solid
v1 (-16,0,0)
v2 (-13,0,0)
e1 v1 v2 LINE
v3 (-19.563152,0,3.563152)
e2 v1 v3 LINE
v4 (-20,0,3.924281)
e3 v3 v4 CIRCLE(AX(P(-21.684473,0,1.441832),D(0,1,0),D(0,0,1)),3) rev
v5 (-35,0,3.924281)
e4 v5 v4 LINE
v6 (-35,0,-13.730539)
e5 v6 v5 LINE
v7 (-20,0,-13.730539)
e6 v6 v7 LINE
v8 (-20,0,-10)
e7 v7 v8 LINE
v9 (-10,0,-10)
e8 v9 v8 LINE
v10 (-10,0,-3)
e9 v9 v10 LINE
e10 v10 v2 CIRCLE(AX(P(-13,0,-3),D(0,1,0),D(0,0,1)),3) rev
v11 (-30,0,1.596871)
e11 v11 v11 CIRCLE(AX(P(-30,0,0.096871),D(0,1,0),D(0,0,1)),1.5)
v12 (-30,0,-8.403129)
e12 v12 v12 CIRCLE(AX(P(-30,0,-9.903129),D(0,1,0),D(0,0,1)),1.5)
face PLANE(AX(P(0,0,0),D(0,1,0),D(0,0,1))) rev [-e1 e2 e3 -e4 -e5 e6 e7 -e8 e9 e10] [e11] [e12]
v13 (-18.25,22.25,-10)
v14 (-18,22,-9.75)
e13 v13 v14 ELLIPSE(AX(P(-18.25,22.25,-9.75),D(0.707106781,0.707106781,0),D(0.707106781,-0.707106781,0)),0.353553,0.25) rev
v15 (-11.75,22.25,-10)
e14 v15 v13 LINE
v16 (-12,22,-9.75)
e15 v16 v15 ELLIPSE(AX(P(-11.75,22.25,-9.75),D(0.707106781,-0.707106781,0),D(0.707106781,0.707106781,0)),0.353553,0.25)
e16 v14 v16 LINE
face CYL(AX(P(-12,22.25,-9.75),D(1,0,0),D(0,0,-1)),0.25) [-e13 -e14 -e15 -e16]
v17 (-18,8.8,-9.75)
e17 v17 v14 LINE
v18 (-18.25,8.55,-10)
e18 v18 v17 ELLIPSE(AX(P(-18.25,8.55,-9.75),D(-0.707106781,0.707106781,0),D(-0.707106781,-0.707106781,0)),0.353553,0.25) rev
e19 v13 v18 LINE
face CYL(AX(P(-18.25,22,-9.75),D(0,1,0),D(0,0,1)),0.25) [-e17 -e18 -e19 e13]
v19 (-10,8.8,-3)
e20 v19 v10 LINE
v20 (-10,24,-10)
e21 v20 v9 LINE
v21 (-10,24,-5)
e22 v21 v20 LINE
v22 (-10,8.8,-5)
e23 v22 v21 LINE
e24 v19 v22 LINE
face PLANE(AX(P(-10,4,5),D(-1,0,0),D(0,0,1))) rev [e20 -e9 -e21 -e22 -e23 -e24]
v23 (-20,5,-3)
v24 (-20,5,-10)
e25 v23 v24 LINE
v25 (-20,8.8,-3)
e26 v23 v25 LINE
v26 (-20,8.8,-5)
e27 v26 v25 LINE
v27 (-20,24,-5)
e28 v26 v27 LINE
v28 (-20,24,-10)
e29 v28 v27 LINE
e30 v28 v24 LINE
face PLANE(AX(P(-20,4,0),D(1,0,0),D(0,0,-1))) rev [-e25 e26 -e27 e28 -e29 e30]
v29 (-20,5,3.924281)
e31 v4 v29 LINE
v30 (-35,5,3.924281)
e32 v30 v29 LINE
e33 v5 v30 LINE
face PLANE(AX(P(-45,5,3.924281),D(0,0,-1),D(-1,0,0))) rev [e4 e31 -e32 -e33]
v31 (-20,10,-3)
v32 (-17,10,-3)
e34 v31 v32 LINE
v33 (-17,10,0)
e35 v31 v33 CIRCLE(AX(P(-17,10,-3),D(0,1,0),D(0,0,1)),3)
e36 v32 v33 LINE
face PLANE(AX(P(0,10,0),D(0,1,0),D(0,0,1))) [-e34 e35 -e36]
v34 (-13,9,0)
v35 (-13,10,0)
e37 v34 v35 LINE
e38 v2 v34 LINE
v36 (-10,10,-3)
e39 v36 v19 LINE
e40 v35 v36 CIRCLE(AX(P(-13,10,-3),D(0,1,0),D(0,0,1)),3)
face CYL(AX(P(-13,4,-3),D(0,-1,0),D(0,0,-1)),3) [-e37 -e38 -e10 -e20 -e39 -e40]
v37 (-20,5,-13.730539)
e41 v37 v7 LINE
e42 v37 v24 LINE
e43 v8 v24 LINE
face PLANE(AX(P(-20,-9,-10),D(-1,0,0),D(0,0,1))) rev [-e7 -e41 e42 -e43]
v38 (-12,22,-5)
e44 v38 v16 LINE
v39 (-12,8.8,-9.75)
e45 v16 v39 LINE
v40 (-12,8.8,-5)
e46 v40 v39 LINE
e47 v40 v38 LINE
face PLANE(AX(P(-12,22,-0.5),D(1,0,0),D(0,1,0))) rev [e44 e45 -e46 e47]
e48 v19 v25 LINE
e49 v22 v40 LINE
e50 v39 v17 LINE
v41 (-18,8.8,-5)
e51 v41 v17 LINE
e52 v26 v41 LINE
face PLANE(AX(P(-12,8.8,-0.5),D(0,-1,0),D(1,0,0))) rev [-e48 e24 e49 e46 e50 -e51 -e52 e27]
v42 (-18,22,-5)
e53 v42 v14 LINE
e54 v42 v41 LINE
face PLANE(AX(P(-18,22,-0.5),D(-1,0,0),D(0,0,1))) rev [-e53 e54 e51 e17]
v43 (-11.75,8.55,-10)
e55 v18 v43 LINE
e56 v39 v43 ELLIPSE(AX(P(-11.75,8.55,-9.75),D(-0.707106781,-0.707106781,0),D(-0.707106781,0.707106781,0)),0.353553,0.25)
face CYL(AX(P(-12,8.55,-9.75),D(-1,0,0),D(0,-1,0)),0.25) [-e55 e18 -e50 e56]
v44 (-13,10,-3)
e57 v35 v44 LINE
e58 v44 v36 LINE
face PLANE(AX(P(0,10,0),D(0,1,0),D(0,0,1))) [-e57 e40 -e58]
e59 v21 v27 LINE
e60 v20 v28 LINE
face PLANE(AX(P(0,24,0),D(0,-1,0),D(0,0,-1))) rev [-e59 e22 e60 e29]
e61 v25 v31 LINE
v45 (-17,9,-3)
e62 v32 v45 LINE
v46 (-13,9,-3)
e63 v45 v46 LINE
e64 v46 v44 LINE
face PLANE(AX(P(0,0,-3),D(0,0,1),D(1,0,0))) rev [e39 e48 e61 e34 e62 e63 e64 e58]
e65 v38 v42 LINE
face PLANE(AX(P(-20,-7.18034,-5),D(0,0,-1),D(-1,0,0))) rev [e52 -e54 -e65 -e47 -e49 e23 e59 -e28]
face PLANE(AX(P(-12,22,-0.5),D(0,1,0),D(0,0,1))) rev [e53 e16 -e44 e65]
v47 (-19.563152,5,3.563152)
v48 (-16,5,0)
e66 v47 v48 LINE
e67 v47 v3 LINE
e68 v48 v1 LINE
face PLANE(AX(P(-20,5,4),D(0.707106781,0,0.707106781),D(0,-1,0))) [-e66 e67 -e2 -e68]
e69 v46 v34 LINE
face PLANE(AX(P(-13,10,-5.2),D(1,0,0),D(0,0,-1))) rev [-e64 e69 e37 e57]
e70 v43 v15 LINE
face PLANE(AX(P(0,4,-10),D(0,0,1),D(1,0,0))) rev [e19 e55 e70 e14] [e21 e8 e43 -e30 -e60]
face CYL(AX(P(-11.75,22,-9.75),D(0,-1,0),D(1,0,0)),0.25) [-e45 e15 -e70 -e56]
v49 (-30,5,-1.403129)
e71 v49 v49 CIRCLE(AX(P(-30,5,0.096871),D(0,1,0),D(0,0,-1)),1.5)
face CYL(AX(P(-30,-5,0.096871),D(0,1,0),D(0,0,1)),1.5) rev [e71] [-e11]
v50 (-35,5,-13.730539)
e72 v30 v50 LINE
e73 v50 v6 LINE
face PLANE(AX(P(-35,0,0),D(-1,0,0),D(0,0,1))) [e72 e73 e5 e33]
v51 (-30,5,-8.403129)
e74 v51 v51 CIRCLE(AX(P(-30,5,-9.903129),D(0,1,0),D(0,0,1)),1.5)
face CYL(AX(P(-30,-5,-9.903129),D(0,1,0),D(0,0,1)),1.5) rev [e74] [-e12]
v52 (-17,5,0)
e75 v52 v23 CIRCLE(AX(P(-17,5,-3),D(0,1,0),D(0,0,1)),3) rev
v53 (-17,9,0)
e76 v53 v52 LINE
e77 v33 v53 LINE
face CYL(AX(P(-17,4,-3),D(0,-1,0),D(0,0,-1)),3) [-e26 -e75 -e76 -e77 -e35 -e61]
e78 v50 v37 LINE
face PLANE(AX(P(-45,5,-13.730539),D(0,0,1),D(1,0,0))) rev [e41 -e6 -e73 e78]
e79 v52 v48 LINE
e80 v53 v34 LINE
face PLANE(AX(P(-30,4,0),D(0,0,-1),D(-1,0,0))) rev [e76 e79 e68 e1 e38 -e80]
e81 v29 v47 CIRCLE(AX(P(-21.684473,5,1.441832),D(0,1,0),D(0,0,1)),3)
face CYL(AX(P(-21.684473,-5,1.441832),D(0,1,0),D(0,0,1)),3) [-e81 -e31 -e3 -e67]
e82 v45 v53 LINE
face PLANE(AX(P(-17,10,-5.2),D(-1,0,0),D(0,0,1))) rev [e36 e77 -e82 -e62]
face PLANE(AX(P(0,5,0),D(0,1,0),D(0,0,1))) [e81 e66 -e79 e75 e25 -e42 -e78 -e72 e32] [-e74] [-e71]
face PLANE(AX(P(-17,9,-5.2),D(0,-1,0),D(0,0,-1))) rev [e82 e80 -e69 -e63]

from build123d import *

# Parameters (mm, degrees)
EXTRUDE_1_DEPTH      = 4
SKETCH_2_W           = 10
SKETCH_2_H           = 15
EXTRUDE_2_DEPTH      = 20
SKETCH_3_R           = 1.45
CUT_EXTRUDE_1_DEPTH  = 20
SKETCH_4_W           = 6
SKETCH_4_H           = 13.2
CUT_EXTRUDE_2_DEPTH  = 9.5
SKETCH_6_R           = 0.75
CUT_EXTRUDE_4_DEPTH  = 3.5
SKETCH_7_W           = 10
SKETCH_7_H           = 24
CUT_EXTRUDE_5_DEPTH  = 5
SKETCH_9_W           = 3
SKETCH_9_H           = 12
CUT_EXTRUDE_6_DEPTH  = 10
SKETCH_11_W          = 1.5
SKETCH_11_H          = 12
CUT_EXTRUDE_7_DEPTH  = 10
CUT_EXTRUDE_8_REACH  = 41.699
SKETCH_13_W          = 10
SKETCH_13_H          = 5
SKETCH_19_W          = 10
SKETCH_19_H          = 2.4
EXTRUDE_6_DEPTH      = 4.8
SKETCH_20_W          = 10
SKETCH_20_H          = 2.6
EXTRUDE_7_DEPTH      = 6
FILLET_17_R          = 0.25
SKETCH_21_W          = 4
SKETCH_21_H          = 1
CUT_EXTRUDE_9_DEPTH  = 5.2
EXTRUDE_8_DEPTH      = 0.4
EXTRUDE_START        = 1
SKETCH_29_W          = 10
SKETCH_29_H          = 10
SKETCH_29_R          = 1.45
EXTRUDE_9_DEPTH      = 1
SKETCH_36_W          = 10
SKETCH_36_H          = 10
CUT_EXTRUDE_10_DEPTH = 10
SKETCH_38_W          = 10
SKETCH_38_H          = 5
EXTRUDE_10_DEPTH     = 20
SKETCH_39_W          = 10
SKETCH_39_H          = 5
EXTRUDE_11_DEPTH     = 10
SKETCH_40_R          = 1.5
CUT_EXTRUDE_11_DEPTH = 15
CHAMFER_1_SIZE       = 4
SKETCH_46_W          = 40
SKETCH_46_H          = 5
EXTRUDE_12_DEPTH     = 32
SKETCH_47_R          = 1.5
CUT_EXTRUDE_12_DEPTH = 10
SKETCH_48_W          = 24
SKETCH_48_H          = 16
SKETCH_48_H_2        = 6.075719237
CUT_EXTRUDE_13_DEPTH = 10
EXTRUDE_13_DEPTH     = 5
CHAMFER_2_SIZE       = 6
FILLET_18_R          = 3
CUT_EXTRUDE_14_DEPTH = 10
SKETCH_55_W          = 17.654819926
SKETCH_55_H          = 5
EXTRUDE_14_DEPTH     = 25
SKETCH_60_W          = 17.654819926
SKETCH_60_H          = 5
CUT_EXTRUDE_15_DEPTH = 10
SKETCH_61_R          = 1.5
CUT_EXTRUDE_16_DEPTH = 10
SKETCH_66_W          = 4.869638013
SKETCH_66_H          = 4.33889787
CUT_EXTRUDE_17_DEPTH = 14


with BuildPart() as part:
    # 草图1 → 凸台-拉伸1 (new body)
    with BuildSketch(Plane(origin=(0, 0, 0), x_dir=(1, 0, 0), z_dir=(0, 1, 0))):
        Polygon((-20, 0), (-20, -5), (-10, -5), (-10, 0), (0, 0), (0, 10), (-30, 10), (-30, 0), align=None)
    extrude(amount=EXTRUDE_1_DEPTH)

    # 草图2 → 凸台-拉伸2 (add)
    with BuildSketch(Plane(origin=(0, 4, 0), x_dir=(1, 0, 0), z_dir=(0, 1, 0))):
        with Locations((-15, 2.5)):
            Rectangle(SKETCH_2_W, SKETCH_2_H)
    extrude(amount=EXTRUDE_2_DEPTH)

    # 草图3 → 切除-拉伸1 (cut)
    with BuildSketch(Plane(origin=(0, 4, 0), x_dir=(1, 0, 0), z_dir=(0, 1, 0))):
        with Locations(Location((-5, 5, 0), (0, 0, 270))):
            Circle(SKETCH_3_R)
    extrude(amount=-CUT_EXTRUDE_1_DEPTH, mode=Mode.SUBTRACT)

    # 草图4 → 切除-拉伸2 (cut)
    with BuildSketch(Plane(origin=(0, 0, -10), x_dir=(-1, 0, 0), z_dir=(0, 0, -1))):
        with Locations((15, 15.4)):
            Rectangle(SKETCH_4_W, SKETCH_4_H)
    extrude(amount=-CUT_EXTRUDE_2_DEPTH, mode=Mode.SUBTRACT)

    # 草图6 → 切除-拉伸4 (cut)
    with BuildSketch(Plane(origin=(0, 0, -0.5), x_dir=(-1, 0, 0), z_dir=(0, 0, -1))):
        with Locations((15, 20.68)):
            Circle(SKETCH_6_R)
        with Locations((15, 10.52)):
            Circle(SKETCH_6_R)
        with Locations((15, 15.6)):
            Circle(SKETCH_6_R)
    extrude(amount=-CUT_EXTRUDE_4_DEPTH, mode=Mode.SUBTRACT)

    # 草图7 → 切除-拉伸5 (cut)
    with BuildSketch(Plane.XY.offset(5)):
        with Locations((-15, 12)):
            Rectangle(SKETCH_7_W, SKETCH_7_H)
    extrude(amount=-CUT_EXTRUDE_5_DEPTH, mode=Mode.SUBTRACT)

    # 草图9 → 切除-拉伸6 (cut)
    with BuildSketch(Plane(origin=(0, 0, -0.5), x_dir=(-1, 0, 0), z_dir=(0, 0, -1))):
        with Locations((15, 15.6)):
            Rectangle(SKETCH_9_W, SKETCH_9_H)
    extrude(amount=-CUT_EXTRUDE_6_DEPTH, mode=Mode.SUBTRACT)

    # 草图11 → 切除-拉伸7 (cut)
    with BuildSketch(Plane(origin=(0, 0, -0.5), x_dir=(-1, 0, 0), z_dir=(0, 0, -1))):
        with Locations((17.25, 15.6)):
            Rectangle(SKETCH_11_W, SKETCH_11_H)
        with Locations((12.75, 15.6)):
            Rectangle(SKETCH_11_W, SKETCH_11_H)
    extrude(amount=-CUT_EXTRUDE_7_DEPTH, mode=Mode.SUBTRACT)

    # 切除-拉伸8: up to this face of the body (flat: up to its plane)
    cut_extrude_8_end = Plane(part.part.faces().sort_by_distance((-5, 4, -9.858578644))[0])
    # 草图13 → 切除-拉伸8 (cut, up to the picked face)
    with BuildSketch(Plane(origin=(0, 24, 0), x_dir=(1, 0, 0), z_dir=(0, 1, 0)), mode=Mode.PRIVATE) as cut_extrude_8_sk1:
        with Locations((-15, 2.5)):
            Rectangle(SKETCH_13_W, SKETCH_13_H)
    cut_extrude_8_tool1 = split(extrude(cut_extrude_8_sk1.sketch, amount=-CUT_EXTRUDE_8_REACH, mode=Mode.PRIVATE), bisect_by=cut_extrude_8_end, keep=Keep.BOTH, mode=Mode.PRIVATE)
    add(cut_extrude_8_tool1.solids().sort_by(Axis((-15, 24, -2.5), (0, -1, 0)))[0], mode=Mode.SUBTRACT)

    # 草图19 → 凸台-拉伸6 (add)
    with BuildSketch(Plane(origin=(0, 4, 0), x_dir=(1, 0, 0), z_dir=(0, 1, 0))):
        with Locations((-15, 3.8)):
            Rectangle(SKETCH_19_W, SKETCH_19_H)
    extrude(amount=EXTRUDE_6_DEPTH)

    # 草图20 → 凸台-拉伸7 (add)
    with BuildSketch(Plane(origin=(0, 4, 0), x_dir=(1, 0, 0), z_dir=(0, 1, 0))):
        with Locations((-15, 1.3)):
            Rectangle(SKETCH_20_W, SKETCH_20_H)
    extrude(amount=EXTRUDE_7_DEPTH)

    # 圆角17
    fillet_17_edges = [part.edges().sort_by_distance(p)[0] for p in [
        (-12, 15.4, -10),
        (-15, 8.8, -10),
        (-18, 15.4, -10),
        (-15, 22, -10),
    ]]
    fillet(fillet_17_edges, radius=FILLET_17_R)

    # 草图21 → 切除-拉伸9 (cut)
    with BuildSketch(Plane.XY):
        with Locations((-15, 9.5)):
            Rectangle(SKETCH_21_W, SKETCH_21_H)
    extrude(amount=-CUT_EXTRUDE_9_DEPTH, mode=Mode.SUBTRACT)

    # 草图22 → 凸台-拉伸8 (add)
    with BuildSketch(Plane(origin=(0, 0, -2.6), x_dir=(-1, 0, 0), z_dir=(0, 0, -1))):
        Polygon((17, 9), (13, 9), (13, 10), (10, 10), (10, 8.8), (20, 8.8), (20, 10), (17, 10), align=None)
    extrude(amount=EXTRUDE_8_DEPTH)

    # 草图29 → 凸台-拉伸9 (add)
    # profile 1 of 2: a face of its own
    with BuildSketch(Plane(origin=(0, 4, 0), x_dir=(1, 0, 0), z_dir=(0, 1, 0)).offset(EXTRUDE_START)):
        with Locations((-25, 5)):
            Rectangle(SKETCH_29_W, SKETCH_29_H)
    # profile 2 of 2: a face of its own
    with BuildSketch(Plane(origin=(0, 4, 0), x_dir=(1, 0, 0), z_dir=(0, 1, 0)).offset(EXTRUDE_START)):
        with Locations((-5, 5)):
            Rectangle(SKETCH_29_W, SKETCH_29_H)
        with Locations(Location((-5, 5, 0), (0, 0, 270))):
            Circle(SKETCH_29_R, mode=Mode.SUBTRACT)
    extrude(amount=-EXTRUDE_9_DEPTH)

    # 草图36 → 切除-拉伸10 (cut)
    with BuildSketch(Plane(origin=(0, 5, 0), x_dir=(1, 0, 0), z_dir=(0, 1, 0))):
        with Locations((-5, 5)):
            Rectangle(SKETCH_36_W, SKETCH_36_H)
    extrude(amount=-CUT_EXTRUDE_10_DEPTH, mode=Mode.SUBTRACT)

    # 草图38 → 凸台-拉伸10 (add)
    with BuildSketch(Plane(origin=(0, 0, -10), x_dir=(-1, 0, 0), z_dir=(0, 0, -1))):
        with Locations((25, 2.5)):
            Rectangle(SKETCH_38_W, SKETCH_38_H)
    extrude(amount=EXTRUDE_10_DEPTH)

    # 草图39 → 凸台-拉伸11 (add)
    with BuildSketch(Plane.XY):
        with Locations((-25, 2.5)):
            Rectangle(SKETCH_39_W, SKETCH_39_H)
    extrude(amount=EXTRUDE_11_DEPTH)

    # 草图40 → 切除-拉伸11 (cut)
    with BuildSketch(Plane(origin=(0, 5, 0), x_dir=(1, 0, 0), z_dir=(0, 1, 0))):
        with Locations(Location((-25, 25, 0), (0, 0, 270))):
            Circle(SKETCH_40_R)
        with Locations(Location((-25, -5, 0), (0, 0, 270))):
            Circle(SKETCH_40_R)
    extrude(amount=-CUT_EXTRUDE_11_DEPTH, mode=Mode.SUBTRACT)

    # 倒角1
    # the kernel refuses this chamfer: 4 mm, written as the material it adds along each edge
    with BuildSketch(Plane(origin=(-20, 5, -10), x_dir=(1, 0, 0), z_dir=(0, -1, 0))) as chamfer_1_piece_1:
        Polygon((CHAMFER_1_SIZE, 0), (0, -CHAMFER_1_SIZE), (0, 0), align=None)
    extrude(amount=5)
    with BuildSketch(Plane(origin=(-20, 0, 0), x_dir=(0, 0, 1), z_dir=(0, 1, 0))) as chamfer_1_piece_2:
        Polygon((CHAMFER_1_SIZE, 0), (0, CHAMFER_1_SIZE), (0, 0), align=None)
    extrude(amount=5)

    # 草图46 → 凸台-拉伸12 (add)
    with BuildSketch(Plane.ZY.offset(30)):
        with Locations((-10, 2.5)):
            Rectangle(SKETCH_46_W, SKETCH_46_H)
    extrude(amount=EXTRUDE_12_DEPTH)

    # 草图47 → 切除-拉伸12 (cut)
    with BuildSketch(Plane(origin=(0, 5, 0), x_dir=(1, 0, 0), z_dir=(0, 1, 0))):
        with Locations(Location((-25, -5, 0), (0, 0, 270))):
            Circle(SKETCH_47_R)
        with Locations(Location((-25, 25, 0), (0, 0, 270))):
            Circle(SKETCH_47_R)
        with Locations(Location((-57, 25, 0), (0, 0, 270))):
            Circle(SKETCH_47_R)
        with Locations(Location((-57, -5, 0), (0, 0, 270))):
            Circle(SKETCH_47_R)
    extrude(amount=-CUT_EXTRUDE_12_DEPTH, mode=Mode.SUBTRACT)

    # 草图48 → 切除-拉伸13 (cut)
    with BuildSketch(Plane(origin=(0, 5, 0), x_dir=(1, 0, 0), z_dir=(0, 1, 0))):
        with Locations((-32, 22)):
            Rectangle(SKETCH_48_W, SKETCH_48_H)
        with Locations((-32, -6.962140382)):
            Rectangle(SKETCH_48_W, SKETCH_48_H_2)
    extrude(amount=-CUT_EXTRUDE_13_DEPTH, mode=Mode.SUBTRACT)

    # 草图49 → 凸台-拉伸13 (add)
    with BuildSketch(Plane(origin=(0, 5, 0), x_dir=(1, 0, 0), z_dir=(0, 1, 0))):
        with BuildLine():
            Line((-26.045384198, -3.924280763), (-23.954615802, -3.924280763))
            ThreePointArc((-23.954615802, -3.924280763), (-25, -3.5), (-26.045384198, -3.924280763))
        make_face()
    extrude(amount=-EXTRUDE_13_DEPTH)

    # 倒角2
    chamfer_2_edges = [part.edges().sort_by_distance(p)[0] for p in [
        (-44, 2.5, -14),
        (-44, 2.5, 3.924280763),
    ]]
    chamfer(chamfer_2_edges, length=CHAMFER_2_SIZE)

    # 圆角18
    # the kernel refuses this fillet: 3 mm, written as the material it takes off along each edge
    with BuildSketch(Plane(origin=(-20, 5, 0), x_dir=(0, 0, -1), z_dir=(0, 1, 0))) as fillet_18_piece_1:
        with BuildLine():
            CenterArc((FILLET_18_R, -FILLET_18_R), FILLET_18_R, 90, 90)
            Line((0, -FILLET_18_R), (0, 0))
            Line((0, 0), (FILLET_18_R, 0))
        make_face()
    extrude(amount=12.5, mode=Mode.SUBTRACT)
    with BuildSketch(Plane(origin=(-10, 17.5, 0), x_dir=(-1, 0, 0), z_dir=(0, -1, 0))) as fillet_18_piece_2:
        with BuildLine():
            CenterArc((FILLET_18_R, FILLET_18_R), FILLET_18_R, 180, 90)
            Line((0, FILLET_18_R), (0, 0))
            Line((0, 0), (FILLET_18_R, 0))
        make_face()
    extrude(amount=25, mode=Mode.SUBTRACT)
    with BuildSketch(Plane(origin=(-20, -1.544489496, 4), x_dir=(0.7071067811865482, 0, -0.7071067811865468), z_dir=(0, 1, 0))) as fillet_18_piece_3:
        with BuildLine():
            CenterArc((0.617795798, 3), FILLET_18_R, 259.158967285, 10.841032715)
            Line((0.053541586, 0.053541586), (0, 0))
            Line((0, 0), (0.617795798, 0))
        make_face()
    extrude(amount=8.088978992, mode=Mode.SUBTRACT)
    with BuildSketch(Plane(origin=(-20, 8.106601718, -14), x_dir=(-1, 0, 0), z_dir=(0, -1, 0))) as fillet_18_piece_4:
        with BuildLine():
            CenterArc((FILLET_18_R * 0.414213562373, -FILLET_18_R), FILLET_18_R, 90, 45)
            Line((-FILLET_18_R * 0.292893218813, -FILLET_18_R * 0.292893218813), (0, 0))
            Line((0, 0), (FILLET_18_R * 0.414213562373, 0))
        make_face()
    extrude(amount=11.213203436, mode=Mode.SUBTRACT)
    with BuildSketch(Plane(origin=(-44, 6.674406651, 10), x_dir=(-1, 0, 0), z_dir=(0, -1, 0))) as fillet_18_piece_5:
        with BuildLine():
            CenterArc((0.66976266, 3), FILLET_18_R, 257.099758761, 12.900241239)
            Line((0, 0.075719237), (0, 0))
            Line((0, 0), (0.66976266, 0))
        make_face()
    extrude(amount=8.348813302, mode=Mode.SUBTRACT)
    with BuildSketch(Plane(origin=(-62, -7.5, 10), x_dir=(0, 0, -1), z_dir=(0, 1, 0))) as fillet_18_piece_6:
        with BuildLine():
            CenterArc((FILLET_18_R, -FILLET_18_R), FILLET_18_R, 90, 90)
            Line((0, -FILLET_18_R), (0, 0))
            Line((0, 0), (FILLET_18_R, 0))
        make_face()
    extrude(amount=20, mode=Mode.SUBTRACT)
    with BuildSketch(Plane(origin=(-62, 12.5, -30), x_dir=(1, 0, 0), z_dir=(0, -1, 0)), Plane(origin=(-44, 12.5, -30), x_dir=(0, 0, 1), z_dir=(0, -1, 0))) as fillet_18_piece_7:
        with BuildLine():
            CenterArc((FILLET_18_R, FILLET_18_R), FILLET_18_R, 180, 90)
            Line((0, FILLET_18_R), (0, 0))
            Line((0, 0), (FILLET_18_R, 0))
        make_face()
    extrude(amount=20, mode=Mode.SUBTRACT)

    # 草图54 → 切除-拉伸14 (cut)
    with BuildSketch(Plane(origin=(0, 5, 0), x_dir=(1, 0, 0), z_dir=(0, 1, 0))):
        Polygon((-20, 3), (-20, 37.818871499), (-71.400493644, 37.818871499), (-71.400493644, 3), (-71.400493644, -21.76419116), (-20, -21.76419116), align=None)
    extrude(amount=-CUT_EXTRUDE_14_DEPTH, mode=Mode.SUBTRACT)

    # 草图55 → 凸台-拉伸14 (add)
    with BuildSketch(Plane.ZY.offset(20)):
        with Locations((-4.9031292, 2.5)):
            Rectangle(SKETCH_55_W, SKETCH_55_H)
    extrude(amount=EXTRUDE_14_DEPTH)

    # 草图60 → 切除-拉伸15 (cut)
    with BuildSketch(Plane.ZY.offset(45)):
        with Locations((-4.9031292, 2.5)):
            Rectangle(SKETCH_60_W, SKETCH_60_H)
    extrude(amount=-CUT_EXTRUDE_15_DEPTH, mode=Mode.SUBTRACT)

    # 草图61 → 切除-拉伸16 (cut)
    with BuildSketch(Plane(origin=(0, 5, 0), x_dir=(1, 0, 0), z_dir=(0, 1, 0))):
        with Locations(Location((-30, 9.9031292, 0), (0, 0, 270))):
            Circle(SKETCH_61_R)
        with Locations(Location((-30, -0.0968708, 0), (0, 0, 270))):
            Circle(SKETCH_61_R)
    extrude(amount=-CUT_EXTRUDE_16_DEPTH, mode=Mode.SUBTRACT)

    # 草图66 → 切除-拉伸17 (cut)
    with BuildSketch(Plane(origin=(0, 5, 0), x_dir=(1, 0, 0), z_dir=(0, 1, 0))):
        with Locations((-17.565180994, 12.169448935)):
            Rectangle(SKETCH_66_W, SKETCH_66_H)
    extrude(amount=-CUT_EXTRUDE_17_DEPTH, mode=Mode.SUBTRACT)


solid = part.part
